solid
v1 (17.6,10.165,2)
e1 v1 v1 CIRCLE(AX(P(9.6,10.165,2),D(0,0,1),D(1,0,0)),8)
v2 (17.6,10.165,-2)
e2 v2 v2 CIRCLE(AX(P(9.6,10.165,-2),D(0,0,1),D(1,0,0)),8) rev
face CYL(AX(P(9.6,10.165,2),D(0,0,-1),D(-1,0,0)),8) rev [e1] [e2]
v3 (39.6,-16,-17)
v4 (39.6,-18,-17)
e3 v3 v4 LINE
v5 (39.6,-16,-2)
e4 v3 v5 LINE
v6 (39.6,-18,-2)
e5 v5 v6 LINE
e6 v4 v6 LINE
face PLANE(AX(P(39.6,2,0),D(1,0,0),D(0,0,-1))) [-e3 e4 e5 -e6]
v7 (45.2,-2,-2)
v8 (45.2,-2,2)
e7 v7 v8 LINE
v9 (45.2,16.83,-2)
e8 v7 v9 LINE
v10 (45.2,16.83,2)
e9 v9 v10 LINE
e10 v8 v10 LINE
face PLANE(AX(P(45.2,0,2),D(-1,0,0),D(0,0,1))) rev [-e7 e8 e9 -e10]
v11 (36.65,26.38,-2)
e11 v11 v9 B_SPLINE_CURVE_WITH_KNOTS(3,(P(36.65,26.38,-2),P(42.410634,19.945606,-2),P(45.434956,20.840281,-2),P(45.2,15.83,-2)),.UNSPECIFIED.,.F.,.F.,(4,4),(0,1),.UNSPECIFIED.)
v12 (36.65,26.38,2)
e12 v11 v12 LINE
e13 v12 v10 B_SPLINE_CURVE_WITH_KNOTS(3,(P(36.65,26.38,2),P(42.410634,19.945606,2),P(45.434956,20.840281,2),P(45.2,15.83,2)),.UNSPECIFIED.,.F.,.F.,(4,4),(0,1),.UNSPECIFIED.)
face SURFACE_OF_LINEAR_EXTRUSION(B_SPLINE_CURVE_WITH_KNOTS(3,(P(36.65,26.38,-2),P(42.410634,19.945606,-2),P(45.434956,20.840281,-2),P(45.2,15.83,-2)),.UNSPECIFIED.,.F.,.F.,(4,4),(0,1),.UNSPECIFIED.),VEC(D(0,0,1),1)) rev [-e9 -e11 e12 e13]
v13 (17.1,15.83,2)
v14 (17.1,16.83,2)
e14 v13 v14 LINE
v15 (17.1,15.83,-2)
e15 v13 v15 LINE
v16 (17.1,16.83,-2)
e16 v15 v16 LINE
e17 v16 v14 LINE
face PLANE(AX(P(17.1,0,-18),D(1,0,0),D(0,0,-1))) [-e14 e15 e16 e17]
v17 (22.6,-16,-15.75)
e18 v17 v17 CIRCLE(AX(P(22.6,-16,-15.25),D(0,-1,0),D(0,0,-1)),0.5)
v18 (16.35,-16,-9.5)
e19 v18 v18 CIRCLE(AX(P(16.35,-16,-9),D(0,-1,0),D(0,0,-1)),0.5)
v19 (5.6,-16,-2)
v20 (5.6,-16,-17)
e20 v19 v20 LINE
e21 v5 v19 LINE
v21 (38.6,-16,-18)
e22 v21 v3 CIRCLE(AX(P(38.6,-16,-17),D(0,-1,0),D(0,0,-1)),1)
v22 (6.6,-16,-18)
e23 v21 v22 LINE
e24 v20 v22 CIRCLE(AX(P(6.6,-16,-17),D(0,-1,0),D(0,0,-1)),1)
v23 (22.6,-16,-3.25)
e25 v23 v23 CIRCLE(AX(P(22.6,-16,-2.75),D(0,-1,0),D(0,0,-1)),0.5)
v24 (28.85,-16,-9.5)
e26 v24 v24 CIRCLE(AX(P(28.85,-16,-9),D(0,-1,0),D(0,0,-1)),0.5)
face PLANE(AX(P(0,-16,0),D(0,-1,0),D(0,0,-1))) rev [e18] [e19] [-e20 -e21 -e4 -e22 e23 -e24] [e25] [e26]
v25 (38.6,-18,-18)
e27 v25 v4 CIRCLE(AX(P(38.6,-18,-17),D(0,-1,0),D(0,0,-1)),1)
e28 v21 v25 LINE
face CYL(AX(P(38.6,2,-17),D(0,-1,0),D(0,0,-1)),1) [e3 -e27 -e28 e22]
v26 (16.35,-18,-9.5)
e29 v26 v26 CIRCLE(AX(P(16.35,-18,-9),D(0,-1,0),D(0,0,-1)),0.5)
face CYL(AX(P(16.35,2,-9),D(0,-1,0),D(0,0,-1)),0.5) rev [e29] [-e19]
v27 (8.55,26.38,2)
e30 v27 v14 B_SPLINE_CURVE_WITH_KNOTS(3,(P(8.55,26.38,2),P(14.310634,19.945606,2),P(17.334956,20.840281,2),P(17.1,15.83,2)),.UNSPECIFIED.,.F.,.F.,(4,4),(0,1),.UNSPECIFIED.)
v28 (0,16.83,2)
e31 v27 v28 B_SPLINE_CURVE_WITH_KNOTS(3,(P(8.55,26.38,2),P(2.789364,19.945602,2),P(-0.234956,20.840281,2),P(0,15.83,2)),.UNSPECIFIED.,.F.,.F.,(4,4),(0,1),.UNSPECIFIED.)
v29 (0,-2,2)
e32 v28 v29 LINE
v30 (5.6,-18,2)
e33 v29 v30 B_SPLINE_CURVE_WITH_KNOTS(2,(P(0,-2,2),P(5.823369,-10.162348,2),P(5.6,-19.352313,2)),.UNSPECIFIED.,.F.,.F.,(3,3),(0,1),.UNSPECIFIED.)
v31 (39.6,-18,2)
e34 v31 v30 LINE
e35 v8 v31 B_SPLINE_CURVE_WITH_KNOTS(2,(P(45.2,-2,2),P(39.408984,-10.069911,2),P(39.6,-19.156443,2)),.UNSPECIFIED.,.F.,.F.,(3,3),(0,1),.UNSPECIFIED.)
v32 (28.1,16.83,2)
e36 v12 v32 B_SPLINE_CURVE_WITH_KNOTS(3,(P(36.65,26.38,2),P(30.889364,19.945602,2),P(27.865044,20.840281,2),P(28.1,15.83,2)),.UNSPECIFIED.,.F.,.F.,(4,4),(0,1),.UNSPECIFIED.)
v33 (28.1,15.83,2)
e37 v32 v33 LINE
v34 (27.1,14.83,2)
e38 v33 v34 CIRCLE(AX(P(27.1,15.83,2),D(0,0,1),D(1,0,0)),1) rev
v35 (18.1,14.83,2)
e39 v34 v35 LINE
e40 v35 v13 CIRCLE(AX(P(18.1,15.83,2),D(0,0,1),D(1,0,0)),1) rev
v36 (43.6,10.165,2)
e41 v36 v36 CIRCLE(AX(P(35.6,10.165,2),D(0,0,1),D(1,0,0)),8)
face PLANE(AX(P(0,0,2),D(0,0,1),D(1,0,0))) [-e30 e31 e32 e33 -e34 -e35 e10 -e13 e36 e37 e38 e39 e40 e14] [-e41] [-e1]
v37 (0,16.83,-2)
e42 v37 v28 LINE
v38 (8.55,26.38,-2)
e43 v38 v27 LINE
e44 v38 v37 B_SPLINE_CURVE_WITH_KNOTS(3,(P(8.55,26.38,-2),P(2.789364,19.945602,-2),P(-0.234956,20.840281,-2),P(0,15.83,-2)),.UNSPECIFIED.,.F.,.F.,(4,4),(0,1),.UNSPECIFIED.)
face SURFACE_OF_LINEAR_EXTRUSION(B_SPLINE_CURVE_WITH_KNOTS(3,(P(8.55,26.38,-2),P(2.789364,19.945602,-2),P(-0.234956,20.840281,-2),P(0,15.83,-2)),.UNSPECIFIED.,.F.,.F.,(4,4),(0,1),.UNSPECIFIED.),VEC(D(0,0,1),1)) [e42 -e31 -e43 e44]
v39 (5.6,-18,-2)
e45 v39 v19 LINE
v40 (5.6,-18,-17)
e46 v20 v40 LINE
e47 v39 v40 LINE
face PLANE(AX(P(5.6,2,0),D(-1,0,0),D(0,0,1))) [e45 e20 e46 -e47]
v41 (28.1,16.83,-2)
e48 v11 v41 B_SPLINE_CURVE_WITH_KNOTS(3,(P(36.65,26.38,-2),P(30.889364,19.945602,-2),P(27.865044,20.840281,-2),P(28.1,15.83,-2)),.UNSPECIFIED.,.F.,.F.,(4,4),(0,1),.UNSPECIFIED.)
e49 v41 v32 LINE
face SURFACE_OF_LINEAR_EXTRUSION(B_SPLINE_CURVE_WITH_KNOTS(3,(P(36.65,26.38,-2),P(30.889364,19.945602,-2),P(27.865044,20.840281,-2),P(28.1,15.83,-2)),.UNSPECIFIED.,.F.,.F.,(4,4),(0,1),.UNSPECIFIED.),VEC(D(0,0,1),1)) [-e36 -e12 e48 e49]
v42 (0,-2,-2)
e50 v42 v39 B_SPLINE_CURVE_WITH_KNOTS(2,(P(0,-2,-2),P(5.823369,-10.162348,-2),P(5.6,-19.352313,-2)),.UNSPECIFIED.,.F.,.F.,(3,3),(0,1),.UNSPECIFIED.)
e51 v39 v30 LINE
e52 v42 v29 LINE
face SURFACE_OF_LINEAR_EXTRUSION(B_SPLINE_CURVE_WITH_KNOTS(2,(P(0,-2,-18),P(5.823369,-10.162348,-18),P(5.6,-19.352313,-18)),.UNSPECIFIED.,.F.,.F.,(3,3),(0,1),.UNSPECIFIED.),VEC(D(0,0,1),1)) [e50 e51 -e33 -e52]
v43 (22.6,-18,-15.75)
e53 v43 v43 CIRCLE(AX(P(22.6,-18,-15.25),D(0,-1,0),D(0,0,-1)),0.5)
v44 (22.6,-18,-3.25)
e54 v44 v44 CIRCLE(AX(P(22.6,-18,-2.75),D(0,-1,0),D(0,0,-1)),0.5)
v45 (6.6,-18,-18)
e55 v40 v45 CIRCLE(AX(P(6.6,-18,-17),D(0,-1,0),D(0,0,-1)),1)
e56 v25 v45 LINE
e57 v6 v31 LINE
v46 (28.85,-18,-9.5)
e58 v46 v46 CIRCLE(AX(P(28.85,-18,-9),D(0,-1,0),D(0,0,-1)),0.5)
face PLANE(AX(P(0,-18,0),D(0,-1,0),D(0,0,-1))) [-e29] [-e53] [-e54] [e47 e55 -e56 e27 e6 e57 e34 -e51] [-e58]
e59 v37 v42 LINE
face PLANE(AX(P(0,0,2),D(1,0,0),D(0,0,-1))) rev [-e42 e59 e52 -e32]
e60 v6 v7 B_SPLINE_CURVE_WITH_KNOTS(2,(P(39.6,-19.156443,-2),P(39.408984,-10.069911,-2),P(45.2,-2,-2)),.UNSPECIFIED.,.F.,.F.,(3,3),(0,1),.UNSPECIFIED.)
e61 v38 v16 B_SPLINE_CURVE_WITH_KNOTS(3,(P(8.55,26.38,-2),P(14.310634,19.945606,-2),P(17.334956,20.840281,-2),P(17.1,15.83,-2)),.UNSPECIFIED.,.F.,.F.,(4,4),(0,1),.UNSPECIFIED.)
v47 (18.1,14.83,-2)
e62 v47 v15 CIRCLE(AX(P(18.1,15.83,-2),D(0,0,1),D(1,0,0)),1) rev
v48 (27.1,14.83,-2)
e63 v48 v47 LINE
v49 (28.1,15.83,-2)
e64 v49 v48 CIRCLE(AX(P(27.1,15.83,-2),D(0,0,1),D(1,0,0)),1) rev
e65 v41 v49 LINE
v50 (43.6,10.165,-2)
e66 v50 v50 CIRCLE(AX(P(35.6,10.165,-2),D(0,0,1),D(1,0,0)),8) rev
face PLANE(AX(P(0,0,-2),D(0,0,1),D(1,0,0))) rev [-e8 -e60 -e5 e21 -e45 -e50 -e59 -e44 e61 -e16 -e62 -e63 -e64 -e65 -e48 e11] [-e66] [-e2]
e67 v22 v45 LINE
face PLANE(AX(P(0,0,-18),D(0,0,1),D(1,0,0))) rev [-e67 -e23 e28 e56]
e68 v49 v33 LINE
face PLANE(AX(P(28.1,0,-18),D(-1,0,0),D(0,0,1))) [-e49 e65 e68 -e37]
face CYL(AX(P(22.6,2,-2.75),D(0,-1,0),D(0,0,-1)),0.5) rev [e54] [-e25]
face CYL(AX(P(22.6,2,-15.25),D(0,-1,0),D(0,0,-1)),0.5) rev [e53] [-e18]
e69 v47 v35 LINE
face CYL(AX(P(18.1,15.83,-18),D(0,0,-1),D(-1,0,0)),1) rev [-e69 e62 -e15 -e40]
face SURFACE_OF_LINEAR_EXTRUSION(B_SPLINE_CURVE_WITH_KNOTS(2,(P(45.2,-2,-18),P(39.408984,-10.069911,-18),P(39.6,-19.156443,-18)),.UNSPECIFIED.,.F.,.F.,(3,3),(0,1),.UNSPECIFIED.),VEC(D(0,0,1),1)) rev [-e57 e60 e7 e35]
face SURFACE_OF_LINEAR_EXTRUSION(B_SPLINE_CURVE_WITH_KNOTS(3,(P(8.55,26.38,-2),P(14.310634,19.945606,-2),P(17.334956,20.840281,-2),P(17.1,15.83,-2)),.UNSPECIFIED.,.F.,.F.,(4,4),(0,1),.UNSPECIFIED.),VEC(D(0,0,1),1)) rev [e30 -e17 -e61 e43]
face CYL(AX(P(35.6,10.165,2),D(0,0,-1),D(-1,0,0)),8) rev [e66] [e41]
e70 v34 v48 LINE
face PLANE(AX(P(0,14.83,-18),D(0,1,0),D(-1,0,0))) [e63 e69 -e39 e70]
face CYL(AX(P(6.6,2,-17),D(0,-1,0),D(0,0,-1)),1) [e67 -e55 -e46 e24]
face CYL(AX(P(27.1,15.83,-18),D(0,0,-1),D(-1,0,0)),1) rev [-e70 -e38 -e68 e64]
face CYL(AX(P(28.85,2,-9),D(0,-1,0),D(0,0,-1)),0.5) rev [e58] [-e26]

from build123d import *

# Parameters (mm, degrees)
SKETCH_1_R           = 8
EXTRUDE_2_DEPTH      = 2
EXTRUDE_3_DEPTH      = 18
EXTRUDE_3_DEPTH_BACK = 1
SKETCH_2_W           = 45.2
SKETCH_2_H           = 2
SKETCH_3_W           = 45.2
SKETCH_3_H           = 18
EXTRUDE_4_DEPTH      = 18
SKETCH_4_W           = 45.2
SKETCH_4_H           = 18
CUT_EXTRUDE_2_DEPTH  = 16
CUT_EXTRUDE_4_DEPTH  = 20
SKETCH_7_W           = 0.117046
SKETCH_7_H           = 18
CUT_EXTRUDE_5_DEPTH  = 20
CUT_EXTRUDE_6_DEPTH  = 20
SKETCH_9_R           = 0.5
CUT_EXTRUDE_7_DEPTH  = 20
CUT_EXTRUDE_8_DEPTH  = 20
FILLET_1_R           = 1
FILLET_2_R           = 1
FILLET_3_R           = 1
SKETCH_14_W          = 47.954779
SKETCH_14_H          = 7.292093
CUT_EXTRUDE_12_DEPTH = 4
EXTRUDE_START        = -4
EXTRUDE_11_OUTLINE_R = 8
EXTRUDE_11_DEPTH     = 4


# Read off the part's stored shape, not the designer's step: 凸台-拉伸11
with BuildPart() as part:
    # 草图1 → 凸台-拉伸2 (new body)
    with BuildSketch(Plane.XY):
        with BuildLine():
            Line((1, 0), (44.2, 0))
            ThreePointArc((44.2, 0), (44.907107, 0.292893), (45.2, 1))
            Line((45.2, 1), (45.2, 19.33))
            ThreePointArc((45.2, 19.33), (44.907107, 20.037107), (44.2, 20.33))
            Line((44.2, 20.33), (1, 20.33))
            ThreePointArc((1, 20.33), (0.292893, 20.037107), (0, 19.33))
            Line((0, 19.33), (0, 1))
            ThreePointArc((0, 1), (0.292893, 0.292893), (1, 0))
        make_face()
        with Locations((35.6, 10.165)):
            Circle(SKETCH_1_R, mode=Mode.SUBTRACT)
        with Locations((9.6, 10.165)):
            Circle(SKETCH_1_R, mode=Mode.SUBTRACT)
    extrude(amount=EXTRUDE_2_DEPTH)

    # 草图2 → 凸台-拉伸3 (add, two sides: drawn at the far end of the back side and taken through both)
    with BuildSketch(Plane.XZ.offset(-EXTRUDE_3_DEPTH_BACK)):
        with Locations((22.6, 1)):
            Rectangle(SKETCH_2_W, SKETCH_2_H)
    extrude(amount=EXTRUDE_3_DEPTH + EXTRUDE_3_DEPTH_BACK)

    # 草图3 → 凸台-拉伸4 (add)
    with BuildSketch(Plane(origin=(0, 0, 0), x_dir=(-1, 0, 0), z_dir=(0, 0, -1))):
        with Locations((-22.6, -9)):
            Rectangle(SKETCH_3_W, SKETCH_3_H)
    extrude(amount=EXTRUDE_4_DEPTH)

    # 草图4 → 切除-拉伸2 (cut)
    with BuildSketch(Plane(origin=(0, 0, 0), x_dir=(1, 0, 0), z_dir=(0, 1, 0))):
        with Locations((22.6, 9)):
            Rectangle(SKETCH_4_W, SKETCH_4_H)
    extrude(amount=-CUT_EXTRUDE_2_DEPTH, mode=Mode.SUBTRACT)

    # 草图5 → 切除-拉伸4 (cut)
    with BuildSketch(Plane.XY.offset(2)):
        Polygon((0, -18), (5.6, -18), (0, -2), align=None)
        with BuildLine():
            Line((0, -2), (5.6, -18))
            add(Edge.make_bspline(
                [(0, -2), (5.393134, -9.559308), (5.6, -18)],
                knots=[0, 0, 0, 0.926119, 0.926119, 0.926119], degree=2))
        make_face()
        with BuildLine():
            add(Edge.make_bspline(
                [(45.2, -2), (39.778817, -9.554541), (39.6, -18)],
                knots=[0, 0, 0, 0.936137, 0.936137, 0.936137], degree=2))
            Line((39.6, -18), (45.2, -18))
            Line((45.2, -18), (45.2, -2))
        make_face()
    extrude(amount=-CUT_EXTRUDE_4_DEPTH, mode=Mode.SUBTRACT)

    # 草图7 → 切除-拉伸5 (cut)
    with BuildSketch(Plane(origin=(0, -18, 0), x_dir=(-1, 0, 0), z_dir=(0, -1, 0))):
        with Locations((-39.658523, 9)):
            Rectangle(SKETCH_7_W, SKETCH_7_H)
    extrude(amount=-CUT_EXTRUDE_5_DEPTH, mode=Mode.SUBTRACT)

    # 草图8 → 切除-拉伸6 (cut)
    with BuildSketch(Plane(origin=(0, -18, 0), x_dir=(-1, 0, 0), z_dir=(0, -1, 0))):
        with BuildLine():
            ThreePointArc((-39.6, 17), (-39.307107, 17.707107), (-38.6, 18))
            Line((-38.6, 18), (-39.6, 18))
            Line((-39.6, 18), (-39.6, 17))
        make_face()
        with BuildLine():
            ThreePointArc((-6.6, 18), (-5.892893, 17.707107), (-5.6, 17))
            Line((-5.6, 17), (-5.6, 18))
            Line((-5.6, 18), (-6.6, 18))
        make_face()
        Polygon((-5.6, 0), (-5.476967, 0), (-5.476967, 18), (-5.6, 18), (-5.6, 17), align=None)
    extrude(amount=-CUT_EXTRUDE_6_DEPTH, mode=Mode.SUBTRACT)

    # 草图9 → 切除-拉伸7 (cut)
    with BuildSketch(Plane.XZ.offset(18)):
        with Locations(Location((16.35, -9, 0), (0, 0, 270))):
            Circle(SKETCH_9_R)
        with Locations(Location((22.6, -2.75, 0), (0, 0, 270))):
            Circle(SKETCH_9_R)
        with Locations(Location((28.85, -9, 0), (0, 0, 270))):
            Circle(SKETCH_9_R)
        with Locations(Location((22.6, -15.25, 0), (0, 0, 270))):
            Circle(SKETCH_9_R)
    extrude(amount=-CUT_EXTRUDE_7_DEPTH, mode=Mode.SUBTRACT)

    # 草图10 → 切除-拉伸8 (cut)
    with BuildSketch(Plane.XY.offset(2)):
        Polygon((22.6, 20.33), (17.1, 20.33), (17.1, 14.83), (28.1, 14.83), (28.1, 20.33), align=None)
    extrude(amount=-CUT_EXTRUDE_8_DEPTH, mode=Mode.SUBTRACT)

    # 圆角1
    fillet_1_edges = [part.edges().sort_by_distance(p)[0] for p in [
        (28.1, 20.33, 1),
        (17.1, 20.33, 1),
    ]]
    fillet(fillet_1_edges, radius=FILLET_1_R)

    # 圆角2
    fillet_2_edges = [part.edges().sort_by_distance(p)[0] for p in [
        (28.1, 14.83, 1),
    ]]
    fillet(fillet_2_edges, radius=FILLET_2_R)

    # 圆角3
    fillet_3_edges = [part.edges().sort_by_distance(p)[0] for p in [
        (17.1, 14.83, 1),
    ]]
    fillet(fillet_3_edges, radius=FILLET_3_R)

    # 草图14 → 切除-拉伸12 (cut)
    with BuildSketch(Plane(origin=(0, 20.33, 0), x_dir=(1, 0, 0), z_dir=(0, 1, 0))):
        with Locations((22.880684, -2.280867)):
            Rectangle(SKETCH_14_W, SKETCH_14_H)
    extrude(amount=-CUT_EXTRUDE_12_DEPTH, mode=Mode.SUBTRACT)

    # 凸台-拉伸11 outline → 凸台-拉伸11 (add)
    with BuildSketch(Plane.XY.offset(2).offset(EXTRUDE_START)):
        with BuildLine():
            add(Edge.make_bspline(
                [(0, -2), (5.393134, -9.559308), (5.6, -18)],
                knots=[0, 0, 0, 0.926119, 0.926119, 0.926119], degree=2))
            Line((5.6, -18), (5.6, -16))
            Line((5.6, -16), (39.6, -16))
            Line((39.6, -16), (39.6, -18))
            add(Edge.make_bspline(
                [(45.2, -2), (39.778817, -9.554541), (39.6, -18)],
                knots=[0, 0, 0, 0.936137, 0.936137, 0.936137], degree=2))
            Line((45.2, -2), (45.2, 16.83))
            add(Edge.make_bspline(
                [(36.65, 26.38), (41.993745, 20.411254), (44.982894, 20.749172), (45.2, 16.83)],
                knots=[0, 0, 0, 0, 0.927631, 0.927631, 0.927631, 0.927631], degree=3))
            add(Edge.make_bspline(
                [(36.65, 26.38), (31.306253, 20.41125), (28.317106, 20.749171), (28.1, 16.83)],
                knots=[0, 0, 0, 0, 0.927631, 0.927631, 0.927631, 0.927631], degree=3))
            Line((28.1, 16.83), (28.1, 15.83))
            ThreePointArc((28.1, 15.83), (27.807107, 15.122893), (27.1, 14.83))
            Line((27.1, 14.83), (18.1, 14.83))
            ThreePointArc((18.1, 14.83), (17.392893, 15.122893), (17.1, 15.83))
            Line((17.1, 15.83), (17.1, 16.83))
            add(Edge.make_bspline(
                [(8.55, 26.38), (13.893745, 20.411254), (16.882894, 20.749172), (17.1, 16.83)],
                knots=[0, 0, 0, 0, 0.927631, 0.927631, 0.927631, 0.927631], degree=3))
            add(Edge.make_bspline(
                [(8.55, 26.38), (3.206253, 20.41125), (0.217106, 20.749171), (0, 16.83)],
                knots=[0, 0, 0, 0, 0.927631, 0.927631, 0.927631, 0.927631], degree=3))
            Line((0, 16.83), (0, -2))
        make_face()
        with Locations((9.6, 10.165)):
            Circle(EXTRUDE_11_OUTLINE_R, mode=Mode.SUBTRACT)
        with Locations((35.6, 10.165)):
            Circle(EXTRUDE_11_OUTLINE_R, mode=Mode.SUBTRACT)
    extrude(amount=EXTRUDE_11_DEPTH)


solid = part.part
